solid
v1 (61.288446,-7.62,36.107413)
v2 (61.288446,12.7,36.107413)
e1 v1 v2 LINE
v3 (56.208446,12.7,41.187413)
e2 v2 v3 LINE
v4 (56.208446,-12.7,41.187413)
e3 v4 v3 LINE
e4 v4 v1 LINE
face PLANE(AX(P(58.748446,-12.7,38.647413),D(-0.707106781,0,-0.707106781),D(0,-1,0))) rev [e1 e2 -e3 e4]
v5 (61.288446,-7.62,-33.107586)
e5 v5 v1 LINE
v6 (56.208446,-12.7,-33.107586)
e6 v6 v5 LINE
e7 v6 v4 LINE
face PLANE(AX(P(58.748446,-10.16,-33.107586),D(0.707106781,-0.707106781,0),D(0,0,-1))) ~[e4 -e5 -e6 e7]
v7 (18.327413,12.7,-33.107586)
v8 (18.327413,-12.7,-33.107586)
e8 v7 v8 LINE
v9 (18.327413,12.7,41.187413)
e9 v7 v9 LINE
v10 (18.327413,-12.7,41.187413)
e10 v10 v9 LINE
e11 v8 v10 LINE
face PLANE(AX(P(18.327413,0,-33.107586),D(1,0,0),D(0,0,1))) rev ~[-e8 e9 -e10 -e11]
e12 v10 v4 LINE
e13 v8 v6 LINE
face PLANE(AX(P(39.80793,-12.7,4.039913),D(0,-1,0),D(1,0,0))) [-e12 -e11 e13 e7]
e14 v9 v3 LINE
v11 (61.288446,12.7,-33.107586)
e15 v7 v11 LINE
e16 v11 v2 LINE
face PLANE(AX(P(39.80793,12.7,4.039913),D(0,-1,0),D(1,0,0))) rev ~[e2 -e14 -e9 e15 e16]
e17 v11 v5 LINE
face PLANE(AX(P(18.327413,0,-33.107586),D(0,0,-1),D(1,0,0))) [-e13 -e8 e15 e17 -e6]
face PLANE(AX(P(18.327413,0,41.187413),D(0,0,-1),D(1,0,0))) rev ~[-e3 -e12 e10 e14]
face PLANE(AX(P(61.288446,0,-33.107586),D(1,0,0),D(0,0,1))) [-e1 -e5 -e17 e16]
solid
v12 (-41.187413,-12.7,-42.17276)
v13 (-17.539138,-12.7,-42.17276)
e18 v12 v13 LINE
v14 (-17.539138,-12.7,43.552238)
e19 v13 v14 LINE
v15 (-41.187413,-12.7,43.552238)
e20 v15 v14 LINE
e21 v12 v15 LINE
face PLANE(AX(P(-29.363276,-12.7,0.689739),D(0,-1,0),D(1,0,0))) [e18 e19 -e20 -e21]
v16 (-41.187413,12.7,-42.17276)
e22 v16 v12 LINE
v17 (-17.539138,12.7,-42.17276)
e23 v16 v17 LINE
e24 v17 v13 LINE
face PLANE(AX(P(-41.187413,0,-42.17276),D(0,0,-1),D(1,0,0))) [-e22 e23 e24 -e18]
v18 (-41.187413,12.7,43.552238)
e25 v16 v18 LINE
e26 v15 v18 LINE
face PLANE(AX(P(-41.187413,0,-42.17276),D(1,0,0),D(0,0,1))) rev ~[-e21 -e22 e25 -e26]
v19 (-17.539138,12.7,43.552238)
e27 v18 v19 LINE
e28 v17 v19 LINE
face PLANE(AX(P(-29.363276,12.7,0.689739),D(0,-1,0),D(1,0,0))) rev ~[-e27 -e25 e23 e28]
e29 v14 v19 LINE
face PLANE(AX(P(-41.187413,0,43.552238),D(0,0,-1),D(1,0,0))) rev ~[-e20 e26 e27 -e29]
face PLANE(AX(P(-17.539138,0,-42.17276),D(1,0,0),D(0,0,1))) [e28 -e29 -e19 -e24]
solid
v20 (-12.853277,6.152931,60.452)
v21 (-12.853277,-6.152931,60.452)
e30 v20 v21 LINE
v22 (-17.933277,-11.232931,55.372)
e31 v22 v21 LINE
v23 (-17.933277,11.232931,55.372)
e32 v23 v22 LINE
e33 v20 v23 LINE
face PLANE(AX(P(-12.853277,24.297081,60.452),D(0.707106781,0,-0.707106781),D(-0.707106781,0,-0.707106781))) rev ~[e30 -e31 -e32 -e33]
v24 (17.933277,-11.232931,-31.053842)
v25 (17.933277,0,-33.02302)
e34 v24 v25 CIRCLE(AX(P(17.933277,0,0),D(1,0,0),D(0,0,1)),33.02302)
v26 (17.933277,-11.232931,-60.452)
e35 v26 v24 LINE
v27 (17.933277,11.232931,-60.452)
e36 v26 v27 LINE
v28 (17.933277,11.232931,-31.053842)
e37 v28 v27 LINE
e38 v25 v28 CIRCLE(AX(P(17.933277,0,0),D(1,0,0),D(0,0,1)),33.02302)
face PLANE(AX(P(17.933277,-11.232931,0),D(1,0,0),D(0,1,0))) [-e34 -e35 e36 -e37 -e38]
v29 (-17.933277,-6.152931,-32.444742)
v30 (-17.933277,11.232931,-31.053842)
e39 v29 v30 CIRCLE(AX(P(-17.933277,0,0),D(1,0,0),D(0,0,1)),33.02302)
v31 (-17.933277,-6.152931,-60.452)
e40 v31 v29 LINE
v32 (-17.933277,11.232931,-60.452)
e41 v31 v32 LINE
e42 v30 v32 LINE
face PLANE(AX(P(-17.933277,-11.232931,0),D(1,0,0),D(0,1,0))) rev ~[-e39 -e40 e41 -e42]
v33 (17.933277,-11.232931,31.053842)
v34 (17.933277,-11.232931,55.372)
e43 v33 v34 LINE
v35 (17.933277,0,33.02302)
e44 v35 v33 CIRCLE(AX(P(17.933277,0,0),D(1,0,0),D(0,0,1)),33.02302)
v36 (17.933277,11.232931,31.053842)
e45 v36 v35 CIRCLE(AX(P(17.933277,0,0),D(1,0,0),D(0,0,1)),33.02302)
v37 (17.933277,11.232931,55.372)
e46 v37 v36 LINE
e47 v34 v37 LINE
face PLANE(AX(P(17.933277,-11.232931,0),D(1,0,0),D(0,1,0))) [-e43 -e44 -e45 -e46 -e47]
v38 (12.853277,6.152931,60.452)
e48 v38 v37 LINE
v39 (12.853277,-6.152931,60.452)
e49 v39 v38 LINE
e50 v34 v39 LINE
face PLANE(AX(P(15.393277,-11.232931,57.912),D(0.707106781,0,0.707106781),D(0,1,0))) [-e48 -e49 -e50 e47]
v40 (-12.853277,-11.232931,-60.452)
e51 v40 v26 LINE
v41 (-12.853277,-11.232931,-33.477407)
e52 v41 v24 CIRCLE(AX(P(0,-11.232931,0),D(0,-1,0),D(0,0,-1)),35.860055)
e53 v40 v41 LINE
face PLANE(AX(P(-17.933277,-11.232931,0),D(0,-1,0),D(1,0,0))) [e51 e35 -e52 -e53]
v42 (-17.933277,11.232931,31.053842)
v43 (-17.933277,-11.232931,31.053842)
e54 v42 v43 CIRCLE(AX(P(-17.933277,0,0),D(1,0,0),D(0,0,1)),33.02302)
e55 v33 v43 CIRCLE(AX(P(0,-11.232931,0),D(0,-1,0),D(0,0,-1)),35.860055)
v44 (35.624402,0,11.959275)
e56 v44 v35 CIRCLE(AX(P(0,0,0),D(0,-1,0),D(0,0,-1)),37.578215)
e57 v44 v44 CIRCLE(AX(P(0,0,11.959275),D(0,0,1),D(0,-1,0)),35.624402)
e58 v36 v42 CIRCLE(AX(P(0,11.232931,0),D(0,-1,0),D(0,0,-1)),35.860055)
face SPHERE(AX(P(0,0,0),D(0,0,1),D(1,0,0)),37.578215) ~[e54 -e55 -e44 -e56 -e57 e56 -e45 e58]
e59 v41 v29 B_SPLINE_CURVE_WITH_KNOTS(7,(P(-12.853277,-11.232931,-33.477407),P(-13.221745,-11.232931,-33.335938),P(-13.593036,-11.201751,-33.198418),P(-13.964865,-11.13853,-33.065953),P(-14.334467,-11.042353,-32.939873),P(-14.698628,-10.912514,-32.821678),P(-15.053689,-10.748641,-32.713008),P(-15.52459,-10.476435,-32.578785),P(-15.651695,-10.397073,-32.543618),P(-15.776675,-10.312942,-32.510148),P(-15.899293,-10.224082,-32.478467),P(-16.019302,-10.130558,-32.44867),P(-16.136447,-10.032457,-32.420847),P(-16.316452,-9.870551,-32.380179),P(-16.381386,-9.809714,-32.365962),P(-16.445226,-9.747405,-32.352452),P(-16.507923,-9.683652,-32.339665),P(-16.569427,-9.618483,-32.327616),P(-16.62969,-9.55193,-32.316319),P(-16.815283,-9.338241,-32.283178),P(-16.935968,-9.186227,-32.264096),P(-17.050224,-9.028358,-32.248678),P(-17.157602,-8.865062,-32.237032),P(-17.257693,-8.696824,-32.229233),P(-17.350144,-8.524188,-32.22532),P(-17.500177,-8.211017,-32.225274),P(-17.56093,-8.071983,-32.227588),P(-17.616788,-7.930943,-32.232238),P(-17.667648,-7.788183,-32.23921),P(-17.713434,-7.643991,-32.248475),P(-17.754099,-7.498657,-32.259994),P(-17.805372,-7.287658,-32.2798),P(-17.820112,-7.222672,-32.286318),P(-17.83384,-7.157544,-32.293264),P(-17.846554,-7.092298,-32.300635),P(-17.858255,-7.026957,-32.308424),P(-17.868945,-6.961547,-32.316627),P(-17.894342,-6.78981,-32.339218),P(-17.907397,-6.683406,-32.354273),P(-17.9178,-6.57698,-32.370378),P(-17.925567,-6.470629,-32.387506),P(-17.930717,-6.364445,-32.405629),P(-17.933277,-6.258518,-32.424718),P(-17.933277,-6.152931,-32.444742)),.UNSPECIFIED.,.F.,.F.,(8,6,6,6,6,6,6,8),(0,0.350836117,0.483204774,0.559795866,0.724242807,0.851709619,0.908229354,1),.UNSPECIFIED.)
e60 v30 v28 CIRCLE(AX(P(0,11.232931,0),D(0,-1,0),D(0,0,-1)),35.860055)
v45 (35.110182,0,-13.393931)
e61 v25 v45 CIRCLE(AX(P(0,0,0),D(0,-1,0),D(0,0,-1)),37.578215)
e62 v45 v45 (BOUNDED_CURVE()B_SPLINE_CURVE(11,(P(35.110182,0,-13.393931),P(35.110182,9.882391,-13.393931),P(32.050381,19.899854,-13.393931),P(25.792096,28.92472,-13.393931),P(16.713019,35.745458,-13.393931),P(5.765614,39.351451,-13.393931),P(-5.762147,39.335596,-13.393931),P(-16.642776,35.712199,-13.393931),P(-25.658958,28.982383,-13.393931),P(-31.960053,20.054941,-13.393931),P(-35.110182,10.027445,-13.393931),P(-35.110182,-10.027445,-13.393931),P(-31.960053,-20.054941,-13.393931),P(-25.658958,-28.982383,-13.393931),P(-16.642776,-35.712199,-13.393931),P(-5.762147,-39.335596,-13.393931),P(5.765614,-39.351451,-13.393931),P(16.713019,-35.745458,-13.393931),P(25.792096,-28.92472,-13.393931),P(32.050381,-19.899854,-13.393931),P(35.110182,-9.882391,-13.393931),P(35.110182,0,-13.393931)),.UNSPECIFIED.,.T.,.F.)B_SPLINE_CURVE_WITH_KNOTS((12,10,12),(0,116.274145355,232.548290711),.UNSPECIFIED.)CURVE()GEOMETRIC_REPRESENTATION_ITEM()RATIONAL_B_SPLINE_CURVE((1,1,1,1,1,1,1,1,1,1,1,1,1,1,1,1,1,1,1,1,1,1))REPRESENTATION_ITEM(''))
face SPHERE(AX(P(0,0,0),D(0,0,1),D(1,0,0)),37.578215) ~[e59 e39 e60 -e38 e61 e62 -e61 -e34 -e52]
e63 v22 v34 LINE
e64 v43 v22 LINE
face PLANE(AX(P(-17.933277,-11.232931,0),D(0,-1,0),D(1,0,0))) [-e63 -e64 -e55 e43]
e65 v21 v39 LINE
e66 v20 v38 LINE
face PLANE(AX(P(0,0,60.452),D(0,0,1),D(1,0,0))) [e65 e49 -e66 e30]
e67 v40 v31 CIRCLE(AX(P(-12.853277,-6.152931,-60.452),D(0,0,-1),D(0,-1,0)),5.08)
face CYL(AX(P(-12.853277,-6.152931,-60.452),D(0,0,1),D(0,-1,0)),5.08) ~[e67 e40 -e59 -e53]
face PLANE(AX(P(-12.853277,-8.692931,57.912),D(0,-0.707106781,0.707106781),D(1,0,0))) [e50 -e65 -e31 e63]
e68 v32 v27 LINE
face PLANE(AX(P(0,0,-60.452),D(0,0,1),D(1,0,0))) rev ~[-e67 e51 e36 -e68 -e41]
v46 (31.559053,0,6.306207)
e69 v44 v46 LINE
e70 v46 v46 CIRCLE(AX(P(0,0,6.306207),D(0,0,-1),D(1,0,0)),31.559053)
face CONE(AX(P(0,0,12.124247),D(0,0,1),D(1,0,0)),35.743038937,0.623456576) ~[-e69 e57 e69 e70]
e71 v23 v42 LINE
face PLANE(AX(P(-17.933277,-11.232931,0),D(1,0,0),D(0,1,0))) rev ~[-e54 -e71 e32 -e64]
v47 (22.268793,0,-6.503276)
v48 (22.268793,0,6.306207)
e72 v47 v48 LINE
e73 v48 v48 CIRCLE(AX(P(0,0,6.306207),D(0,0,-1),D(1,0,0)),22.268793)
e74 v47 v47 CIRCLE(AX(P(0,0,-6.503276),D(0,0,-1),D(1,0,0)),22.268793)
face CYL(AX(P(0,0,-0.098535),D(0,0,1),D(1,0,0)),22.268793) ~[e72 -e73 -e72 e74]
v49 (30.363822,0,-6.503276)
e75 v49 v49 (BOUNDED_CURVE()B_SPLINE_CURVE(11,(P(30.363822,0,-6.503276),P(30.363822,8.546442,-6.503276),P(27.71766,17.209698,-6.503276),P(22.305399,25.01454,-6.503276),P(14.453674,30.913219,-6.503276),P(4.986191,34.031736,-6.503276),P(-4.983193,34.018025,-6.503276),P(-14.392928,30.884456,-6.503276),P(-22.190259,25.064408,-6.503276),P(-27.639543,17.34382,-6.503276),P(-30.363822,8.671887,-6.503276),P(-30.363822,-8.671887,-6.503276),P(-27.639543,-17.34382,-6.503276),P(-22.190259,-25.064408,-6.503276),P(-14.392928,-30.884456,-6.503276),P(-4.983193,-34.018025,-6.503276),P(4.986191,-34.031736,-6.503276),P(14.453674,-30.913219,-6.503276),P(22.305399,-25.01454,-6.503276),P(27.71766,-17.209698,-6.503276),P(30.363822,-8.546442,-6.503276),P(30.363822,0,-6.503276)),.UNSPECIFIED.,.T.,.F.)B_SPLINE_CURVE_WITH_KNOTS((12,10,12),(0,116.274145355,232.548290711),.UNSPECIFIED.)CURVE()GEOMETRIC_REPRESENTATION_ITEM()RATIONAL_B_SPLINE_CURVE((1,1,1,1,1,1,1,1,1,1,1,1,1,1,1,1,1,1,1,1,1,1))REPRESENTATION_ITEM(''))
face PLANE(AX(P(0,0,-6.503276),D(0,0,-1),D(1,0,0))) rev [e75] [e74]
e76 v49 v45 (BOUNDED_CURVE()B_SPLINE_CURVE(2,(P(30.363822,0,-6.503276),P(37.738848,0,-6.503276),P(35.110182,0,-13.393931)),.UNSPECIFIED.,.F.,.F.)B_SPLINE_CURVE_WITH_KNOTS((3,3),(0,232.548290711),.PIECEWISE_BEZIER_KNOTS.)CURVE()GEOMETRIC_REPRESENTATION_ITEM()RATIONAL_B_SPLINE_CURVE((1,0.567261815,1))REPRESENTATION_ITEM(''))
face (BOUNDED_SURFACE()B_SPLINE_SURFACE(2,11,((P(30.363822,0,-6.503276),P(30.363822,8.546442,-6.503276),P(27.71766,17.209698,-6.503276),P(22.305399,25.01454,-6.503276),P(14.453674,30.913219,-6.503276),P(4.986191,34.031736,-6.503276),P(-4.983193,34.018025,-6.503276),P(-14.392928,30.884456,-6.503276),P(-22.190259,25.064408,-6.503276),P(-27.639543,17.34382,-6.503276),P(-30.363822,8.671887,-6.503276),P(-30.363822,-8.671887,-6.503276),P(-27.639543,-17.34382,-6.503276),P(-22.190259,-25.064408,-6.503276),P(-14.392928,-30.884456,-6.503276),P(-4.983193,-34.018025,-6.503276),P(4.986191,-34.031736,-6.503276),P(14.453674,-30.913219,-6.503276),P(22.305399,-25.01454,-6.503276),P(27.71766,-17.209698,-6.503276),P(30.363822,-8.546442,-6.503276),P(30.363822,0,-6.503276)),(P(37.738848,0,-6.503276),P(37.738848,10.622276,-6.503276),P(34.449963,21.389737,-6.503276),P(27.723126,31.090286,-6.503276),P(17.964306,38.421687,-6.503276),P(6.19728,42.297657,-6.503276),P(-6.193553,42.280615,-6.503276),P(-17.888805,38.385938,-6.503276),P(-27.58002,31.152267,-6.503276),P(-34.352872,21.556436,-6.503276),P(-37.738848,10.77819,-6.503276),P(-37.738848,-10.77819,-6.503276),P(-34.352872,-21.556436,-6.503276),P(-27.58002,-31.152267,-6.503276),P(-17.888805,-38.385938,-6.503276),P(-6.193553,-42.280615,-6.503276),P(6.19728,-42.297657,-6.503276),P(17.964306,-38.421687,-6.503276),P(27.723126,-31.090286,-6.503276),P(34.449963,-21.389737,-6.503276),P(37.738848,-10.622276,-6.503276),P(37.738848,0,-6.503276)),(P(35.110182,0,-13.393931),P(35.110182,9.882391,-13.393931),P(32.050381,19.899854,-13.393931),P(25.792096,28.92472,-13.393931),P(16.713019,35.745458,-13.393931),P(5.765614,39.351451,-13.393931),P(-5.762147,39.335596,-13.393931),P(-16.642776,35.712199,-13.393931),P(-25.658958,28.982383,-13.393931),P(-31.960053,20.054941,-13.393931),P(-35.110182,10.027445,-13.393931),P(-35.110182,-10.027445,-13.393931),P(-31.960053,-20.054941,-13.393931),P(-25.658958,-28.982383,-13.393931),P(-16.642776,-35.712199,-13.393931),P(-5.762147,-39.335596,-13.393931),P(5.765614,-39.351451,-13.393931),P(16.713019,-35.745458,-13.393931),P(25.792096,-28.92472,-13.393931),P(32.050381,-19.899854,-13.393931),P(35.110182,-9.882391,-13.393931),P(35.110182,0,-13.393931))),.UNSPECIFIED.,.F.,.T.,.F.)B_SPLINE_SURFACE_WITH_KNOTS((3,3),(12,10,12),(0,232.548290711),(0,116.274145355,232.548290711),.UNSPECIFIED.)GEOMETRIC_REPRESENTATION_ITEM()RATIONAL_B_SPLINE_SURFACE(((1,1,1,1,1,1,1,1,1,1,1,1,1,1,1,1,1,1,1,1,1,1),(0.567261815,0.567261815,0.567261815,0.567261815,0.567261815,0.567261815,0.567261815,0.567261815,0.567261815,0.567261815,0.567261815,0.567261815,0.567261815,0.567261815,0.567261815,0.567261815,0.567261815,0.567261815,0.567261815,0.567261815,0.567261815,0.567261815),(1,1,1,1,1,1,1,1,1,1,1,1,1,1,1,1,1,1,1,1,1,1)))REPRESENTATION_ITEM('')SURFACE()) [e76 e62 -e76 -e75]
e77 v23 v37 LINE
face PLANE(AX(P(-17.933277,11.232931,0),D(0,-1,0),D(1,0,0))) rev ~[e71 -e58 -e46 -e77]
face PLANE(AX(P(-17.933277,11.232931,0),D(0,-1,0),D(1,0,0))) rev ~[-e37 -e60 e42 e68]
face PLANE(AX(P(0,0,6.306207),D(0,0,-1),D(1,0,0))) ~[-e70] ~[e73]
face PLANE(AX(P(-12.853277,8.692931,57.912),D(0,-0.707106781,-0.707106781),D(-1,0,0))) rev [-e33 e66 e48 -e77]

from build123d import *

# Parameters (mm, degrees)
F2_W        = 27.9908
F2_H        = 12.8094828688
F4_W        = 35.8665548265
F4_H        = 22.4658623338
F5_DEPTH    = 60.452
F6_SIZE     = 5.08
F7_T1_DEPTH = 48.5941614915
F8_SIZE     = 5.08
F9_SIZE     = 5.08
F11_R       = 5.08
F12_R       = 5.08
F13_W       = 23.6482750624
F13_H       = 85.7249982655
F14_DEPTH   = 12.7
F15_W       = 42.9610330611
F15_H       = 74.2949992418
F16_DEPTH   = 12.7
F17_SIZE    = 5.08
F18_SIZE    = 5.08


# Not quite as in the source:
# - a fillet or chamfer that OpenCascade refuses, or shapes differently, is made with other operations: its cross-section is extruded or revolved along the edge and cut away or added


with BuildPart() as f1:
    # F0 (on Front) → F1 (revolve)
    with BuildSketch(Plane.XZ):
        with BuildLine():
            Line((0, 37.5782152754), (0, -37.5782152754))
            ThreePointArc((0, -37.5782152754), (37.5782152754, 0), (0, 37.5782152754))
        make_face()
    revolve(axis=Axis((0, 0, 0), (0, 0, -1)))

    # F2 (on Front) → F3 (revolve, cut)
    with BuildSketch(Plane.XZ):
        with Locations((36.2641926143, -0.0985346269)):
            Rectangle(F2_W, F2_H)
    revolve(axis=Axis((0, 0, 0.5912072957), (0, 0, -1)), mode=Mode.SUBTRACT)

    # F4 (on Top) → F5 (join, symmetric)
    with BuildSketch(Plane.XY):
        Rectangle(F4_W, F4_H)
    extrude(amount=F5_DEPTH, both=True)

    # F6
    f6_edges = [f1.edges().sort_by_distance(p)[0] for p in [
        (17.933277, 0, 60.452),
    ]]
    chamfer(f6_edges, length=F6_SIZE)

    # F7: chamfer of 5.08 on 1 edges, made by hand

    # F7_s2 → F7_t1 (cut)
    with BuildSketch(Plane.XZ.offset(-24.2970807458)):
        Polygon((-12.8532774132, 60.452), (-17.9332774132, 55.372), (-17.9332774132, 60.452), align=None)
    extrude(amount=F7_T1_DEPTH, mode=Mode.SUBTRACT)

    # F8
    f8_edges = [f1.edges().sort_by_distance(p)[0] for p in [
        (0, -11.232931, 60.452),
    ]]
    chamfer(f8_edges, length=F8_SIZE)

    # F9
    f9_edges = [f1.edges().sort_by_distance(p)[0] for p in [
        (0, 11.232931, 60.452),
    ]]
    chamfer(f9_edges, length=F9_SIZE)

    # F10: chamfer of 5.08 on 1 edges, made by hand

    # F10_s1 → F10_t2 (revolve, cut)
    with BuildSketch(Plane.XZ):
        with BuildLine():
            Line((35.7430389368, 12.1242465057), (31.4404153436, 6.1412357976))
            Line((31.4404153436, 6.1412357976), (31.4404153436, 6.0396357976))
            ThreePointArc((31.4404153436, 6.0396357976), (34.2428560987, 6.2046068075), (37.0452968537, 6.2046068075))
            Line((37.0452968537, 6.2046068075), (37.1454560053, 6.3232568618))
            ThreePointArc((37.1454560053, 6.3232568618), (36.5270685447, 9.2488779166), (35.8393564224, 12.1565807287))
            Line((35.8393564224, 12.1565807287), (35.7430389368, 12.1242465057))
        make_face()
    revolve(axis=Axis((0, 0, 6.3062068075), (0, 0, 1)), mode=Mode.SUBTRACT)

    # F11
    f11_edges = [f1.edges().sort_by_distance(p)[0] for p in [
        (-37.01121, 0, -6.503276),
    ]]
    fillet(f11_edges, radius=F11_R)

    # F12
    f12_edges = [f1.edges().sort_by_distance(p)[0] for p in [
        (-17.933277, -11.232931, -45.752921),
    ]]
    fillet(f12_edges, radius=F12_R)


with BuildPart() as f14:
    # F13 (on Front) → F14 (new body, symmetric)
    with BuildSketch(Plane.XZ):
        with Locations((-29.3632755056, 0.6897393614)):
            Rectangle(F13_W, F13_H)
    extrude(amount=F14_DEPTH, both=True)


with BuildPart() as f16:
    # F15 (on Front) → F16 (new body, symmetric)
    with BuildSketch(Plane.XZ):
        with Locations((39.8079296574, 4.0399134159)):
            Rectangle(F15_W, F15_H)
    extrude(amount=F16_DEPTH, both=True)

    # F17
    f17_edges = [f16.edges().sort_by_distance(p)[0] for p in [
        (61.288446, 0, 41.187413),
    ]]
    chamfer(f17_edges, length=F17_SIZE)

    # F18
    f18_edges = [f16.edges().sort_by_distance(p)[0] for p in [
        (61.288446, -12.7, 1.499913),
    ]]
    chamfer(f18_edges, length=F18_SIZE)


solid = Compound([f1.part, f14.part, f16.part])
